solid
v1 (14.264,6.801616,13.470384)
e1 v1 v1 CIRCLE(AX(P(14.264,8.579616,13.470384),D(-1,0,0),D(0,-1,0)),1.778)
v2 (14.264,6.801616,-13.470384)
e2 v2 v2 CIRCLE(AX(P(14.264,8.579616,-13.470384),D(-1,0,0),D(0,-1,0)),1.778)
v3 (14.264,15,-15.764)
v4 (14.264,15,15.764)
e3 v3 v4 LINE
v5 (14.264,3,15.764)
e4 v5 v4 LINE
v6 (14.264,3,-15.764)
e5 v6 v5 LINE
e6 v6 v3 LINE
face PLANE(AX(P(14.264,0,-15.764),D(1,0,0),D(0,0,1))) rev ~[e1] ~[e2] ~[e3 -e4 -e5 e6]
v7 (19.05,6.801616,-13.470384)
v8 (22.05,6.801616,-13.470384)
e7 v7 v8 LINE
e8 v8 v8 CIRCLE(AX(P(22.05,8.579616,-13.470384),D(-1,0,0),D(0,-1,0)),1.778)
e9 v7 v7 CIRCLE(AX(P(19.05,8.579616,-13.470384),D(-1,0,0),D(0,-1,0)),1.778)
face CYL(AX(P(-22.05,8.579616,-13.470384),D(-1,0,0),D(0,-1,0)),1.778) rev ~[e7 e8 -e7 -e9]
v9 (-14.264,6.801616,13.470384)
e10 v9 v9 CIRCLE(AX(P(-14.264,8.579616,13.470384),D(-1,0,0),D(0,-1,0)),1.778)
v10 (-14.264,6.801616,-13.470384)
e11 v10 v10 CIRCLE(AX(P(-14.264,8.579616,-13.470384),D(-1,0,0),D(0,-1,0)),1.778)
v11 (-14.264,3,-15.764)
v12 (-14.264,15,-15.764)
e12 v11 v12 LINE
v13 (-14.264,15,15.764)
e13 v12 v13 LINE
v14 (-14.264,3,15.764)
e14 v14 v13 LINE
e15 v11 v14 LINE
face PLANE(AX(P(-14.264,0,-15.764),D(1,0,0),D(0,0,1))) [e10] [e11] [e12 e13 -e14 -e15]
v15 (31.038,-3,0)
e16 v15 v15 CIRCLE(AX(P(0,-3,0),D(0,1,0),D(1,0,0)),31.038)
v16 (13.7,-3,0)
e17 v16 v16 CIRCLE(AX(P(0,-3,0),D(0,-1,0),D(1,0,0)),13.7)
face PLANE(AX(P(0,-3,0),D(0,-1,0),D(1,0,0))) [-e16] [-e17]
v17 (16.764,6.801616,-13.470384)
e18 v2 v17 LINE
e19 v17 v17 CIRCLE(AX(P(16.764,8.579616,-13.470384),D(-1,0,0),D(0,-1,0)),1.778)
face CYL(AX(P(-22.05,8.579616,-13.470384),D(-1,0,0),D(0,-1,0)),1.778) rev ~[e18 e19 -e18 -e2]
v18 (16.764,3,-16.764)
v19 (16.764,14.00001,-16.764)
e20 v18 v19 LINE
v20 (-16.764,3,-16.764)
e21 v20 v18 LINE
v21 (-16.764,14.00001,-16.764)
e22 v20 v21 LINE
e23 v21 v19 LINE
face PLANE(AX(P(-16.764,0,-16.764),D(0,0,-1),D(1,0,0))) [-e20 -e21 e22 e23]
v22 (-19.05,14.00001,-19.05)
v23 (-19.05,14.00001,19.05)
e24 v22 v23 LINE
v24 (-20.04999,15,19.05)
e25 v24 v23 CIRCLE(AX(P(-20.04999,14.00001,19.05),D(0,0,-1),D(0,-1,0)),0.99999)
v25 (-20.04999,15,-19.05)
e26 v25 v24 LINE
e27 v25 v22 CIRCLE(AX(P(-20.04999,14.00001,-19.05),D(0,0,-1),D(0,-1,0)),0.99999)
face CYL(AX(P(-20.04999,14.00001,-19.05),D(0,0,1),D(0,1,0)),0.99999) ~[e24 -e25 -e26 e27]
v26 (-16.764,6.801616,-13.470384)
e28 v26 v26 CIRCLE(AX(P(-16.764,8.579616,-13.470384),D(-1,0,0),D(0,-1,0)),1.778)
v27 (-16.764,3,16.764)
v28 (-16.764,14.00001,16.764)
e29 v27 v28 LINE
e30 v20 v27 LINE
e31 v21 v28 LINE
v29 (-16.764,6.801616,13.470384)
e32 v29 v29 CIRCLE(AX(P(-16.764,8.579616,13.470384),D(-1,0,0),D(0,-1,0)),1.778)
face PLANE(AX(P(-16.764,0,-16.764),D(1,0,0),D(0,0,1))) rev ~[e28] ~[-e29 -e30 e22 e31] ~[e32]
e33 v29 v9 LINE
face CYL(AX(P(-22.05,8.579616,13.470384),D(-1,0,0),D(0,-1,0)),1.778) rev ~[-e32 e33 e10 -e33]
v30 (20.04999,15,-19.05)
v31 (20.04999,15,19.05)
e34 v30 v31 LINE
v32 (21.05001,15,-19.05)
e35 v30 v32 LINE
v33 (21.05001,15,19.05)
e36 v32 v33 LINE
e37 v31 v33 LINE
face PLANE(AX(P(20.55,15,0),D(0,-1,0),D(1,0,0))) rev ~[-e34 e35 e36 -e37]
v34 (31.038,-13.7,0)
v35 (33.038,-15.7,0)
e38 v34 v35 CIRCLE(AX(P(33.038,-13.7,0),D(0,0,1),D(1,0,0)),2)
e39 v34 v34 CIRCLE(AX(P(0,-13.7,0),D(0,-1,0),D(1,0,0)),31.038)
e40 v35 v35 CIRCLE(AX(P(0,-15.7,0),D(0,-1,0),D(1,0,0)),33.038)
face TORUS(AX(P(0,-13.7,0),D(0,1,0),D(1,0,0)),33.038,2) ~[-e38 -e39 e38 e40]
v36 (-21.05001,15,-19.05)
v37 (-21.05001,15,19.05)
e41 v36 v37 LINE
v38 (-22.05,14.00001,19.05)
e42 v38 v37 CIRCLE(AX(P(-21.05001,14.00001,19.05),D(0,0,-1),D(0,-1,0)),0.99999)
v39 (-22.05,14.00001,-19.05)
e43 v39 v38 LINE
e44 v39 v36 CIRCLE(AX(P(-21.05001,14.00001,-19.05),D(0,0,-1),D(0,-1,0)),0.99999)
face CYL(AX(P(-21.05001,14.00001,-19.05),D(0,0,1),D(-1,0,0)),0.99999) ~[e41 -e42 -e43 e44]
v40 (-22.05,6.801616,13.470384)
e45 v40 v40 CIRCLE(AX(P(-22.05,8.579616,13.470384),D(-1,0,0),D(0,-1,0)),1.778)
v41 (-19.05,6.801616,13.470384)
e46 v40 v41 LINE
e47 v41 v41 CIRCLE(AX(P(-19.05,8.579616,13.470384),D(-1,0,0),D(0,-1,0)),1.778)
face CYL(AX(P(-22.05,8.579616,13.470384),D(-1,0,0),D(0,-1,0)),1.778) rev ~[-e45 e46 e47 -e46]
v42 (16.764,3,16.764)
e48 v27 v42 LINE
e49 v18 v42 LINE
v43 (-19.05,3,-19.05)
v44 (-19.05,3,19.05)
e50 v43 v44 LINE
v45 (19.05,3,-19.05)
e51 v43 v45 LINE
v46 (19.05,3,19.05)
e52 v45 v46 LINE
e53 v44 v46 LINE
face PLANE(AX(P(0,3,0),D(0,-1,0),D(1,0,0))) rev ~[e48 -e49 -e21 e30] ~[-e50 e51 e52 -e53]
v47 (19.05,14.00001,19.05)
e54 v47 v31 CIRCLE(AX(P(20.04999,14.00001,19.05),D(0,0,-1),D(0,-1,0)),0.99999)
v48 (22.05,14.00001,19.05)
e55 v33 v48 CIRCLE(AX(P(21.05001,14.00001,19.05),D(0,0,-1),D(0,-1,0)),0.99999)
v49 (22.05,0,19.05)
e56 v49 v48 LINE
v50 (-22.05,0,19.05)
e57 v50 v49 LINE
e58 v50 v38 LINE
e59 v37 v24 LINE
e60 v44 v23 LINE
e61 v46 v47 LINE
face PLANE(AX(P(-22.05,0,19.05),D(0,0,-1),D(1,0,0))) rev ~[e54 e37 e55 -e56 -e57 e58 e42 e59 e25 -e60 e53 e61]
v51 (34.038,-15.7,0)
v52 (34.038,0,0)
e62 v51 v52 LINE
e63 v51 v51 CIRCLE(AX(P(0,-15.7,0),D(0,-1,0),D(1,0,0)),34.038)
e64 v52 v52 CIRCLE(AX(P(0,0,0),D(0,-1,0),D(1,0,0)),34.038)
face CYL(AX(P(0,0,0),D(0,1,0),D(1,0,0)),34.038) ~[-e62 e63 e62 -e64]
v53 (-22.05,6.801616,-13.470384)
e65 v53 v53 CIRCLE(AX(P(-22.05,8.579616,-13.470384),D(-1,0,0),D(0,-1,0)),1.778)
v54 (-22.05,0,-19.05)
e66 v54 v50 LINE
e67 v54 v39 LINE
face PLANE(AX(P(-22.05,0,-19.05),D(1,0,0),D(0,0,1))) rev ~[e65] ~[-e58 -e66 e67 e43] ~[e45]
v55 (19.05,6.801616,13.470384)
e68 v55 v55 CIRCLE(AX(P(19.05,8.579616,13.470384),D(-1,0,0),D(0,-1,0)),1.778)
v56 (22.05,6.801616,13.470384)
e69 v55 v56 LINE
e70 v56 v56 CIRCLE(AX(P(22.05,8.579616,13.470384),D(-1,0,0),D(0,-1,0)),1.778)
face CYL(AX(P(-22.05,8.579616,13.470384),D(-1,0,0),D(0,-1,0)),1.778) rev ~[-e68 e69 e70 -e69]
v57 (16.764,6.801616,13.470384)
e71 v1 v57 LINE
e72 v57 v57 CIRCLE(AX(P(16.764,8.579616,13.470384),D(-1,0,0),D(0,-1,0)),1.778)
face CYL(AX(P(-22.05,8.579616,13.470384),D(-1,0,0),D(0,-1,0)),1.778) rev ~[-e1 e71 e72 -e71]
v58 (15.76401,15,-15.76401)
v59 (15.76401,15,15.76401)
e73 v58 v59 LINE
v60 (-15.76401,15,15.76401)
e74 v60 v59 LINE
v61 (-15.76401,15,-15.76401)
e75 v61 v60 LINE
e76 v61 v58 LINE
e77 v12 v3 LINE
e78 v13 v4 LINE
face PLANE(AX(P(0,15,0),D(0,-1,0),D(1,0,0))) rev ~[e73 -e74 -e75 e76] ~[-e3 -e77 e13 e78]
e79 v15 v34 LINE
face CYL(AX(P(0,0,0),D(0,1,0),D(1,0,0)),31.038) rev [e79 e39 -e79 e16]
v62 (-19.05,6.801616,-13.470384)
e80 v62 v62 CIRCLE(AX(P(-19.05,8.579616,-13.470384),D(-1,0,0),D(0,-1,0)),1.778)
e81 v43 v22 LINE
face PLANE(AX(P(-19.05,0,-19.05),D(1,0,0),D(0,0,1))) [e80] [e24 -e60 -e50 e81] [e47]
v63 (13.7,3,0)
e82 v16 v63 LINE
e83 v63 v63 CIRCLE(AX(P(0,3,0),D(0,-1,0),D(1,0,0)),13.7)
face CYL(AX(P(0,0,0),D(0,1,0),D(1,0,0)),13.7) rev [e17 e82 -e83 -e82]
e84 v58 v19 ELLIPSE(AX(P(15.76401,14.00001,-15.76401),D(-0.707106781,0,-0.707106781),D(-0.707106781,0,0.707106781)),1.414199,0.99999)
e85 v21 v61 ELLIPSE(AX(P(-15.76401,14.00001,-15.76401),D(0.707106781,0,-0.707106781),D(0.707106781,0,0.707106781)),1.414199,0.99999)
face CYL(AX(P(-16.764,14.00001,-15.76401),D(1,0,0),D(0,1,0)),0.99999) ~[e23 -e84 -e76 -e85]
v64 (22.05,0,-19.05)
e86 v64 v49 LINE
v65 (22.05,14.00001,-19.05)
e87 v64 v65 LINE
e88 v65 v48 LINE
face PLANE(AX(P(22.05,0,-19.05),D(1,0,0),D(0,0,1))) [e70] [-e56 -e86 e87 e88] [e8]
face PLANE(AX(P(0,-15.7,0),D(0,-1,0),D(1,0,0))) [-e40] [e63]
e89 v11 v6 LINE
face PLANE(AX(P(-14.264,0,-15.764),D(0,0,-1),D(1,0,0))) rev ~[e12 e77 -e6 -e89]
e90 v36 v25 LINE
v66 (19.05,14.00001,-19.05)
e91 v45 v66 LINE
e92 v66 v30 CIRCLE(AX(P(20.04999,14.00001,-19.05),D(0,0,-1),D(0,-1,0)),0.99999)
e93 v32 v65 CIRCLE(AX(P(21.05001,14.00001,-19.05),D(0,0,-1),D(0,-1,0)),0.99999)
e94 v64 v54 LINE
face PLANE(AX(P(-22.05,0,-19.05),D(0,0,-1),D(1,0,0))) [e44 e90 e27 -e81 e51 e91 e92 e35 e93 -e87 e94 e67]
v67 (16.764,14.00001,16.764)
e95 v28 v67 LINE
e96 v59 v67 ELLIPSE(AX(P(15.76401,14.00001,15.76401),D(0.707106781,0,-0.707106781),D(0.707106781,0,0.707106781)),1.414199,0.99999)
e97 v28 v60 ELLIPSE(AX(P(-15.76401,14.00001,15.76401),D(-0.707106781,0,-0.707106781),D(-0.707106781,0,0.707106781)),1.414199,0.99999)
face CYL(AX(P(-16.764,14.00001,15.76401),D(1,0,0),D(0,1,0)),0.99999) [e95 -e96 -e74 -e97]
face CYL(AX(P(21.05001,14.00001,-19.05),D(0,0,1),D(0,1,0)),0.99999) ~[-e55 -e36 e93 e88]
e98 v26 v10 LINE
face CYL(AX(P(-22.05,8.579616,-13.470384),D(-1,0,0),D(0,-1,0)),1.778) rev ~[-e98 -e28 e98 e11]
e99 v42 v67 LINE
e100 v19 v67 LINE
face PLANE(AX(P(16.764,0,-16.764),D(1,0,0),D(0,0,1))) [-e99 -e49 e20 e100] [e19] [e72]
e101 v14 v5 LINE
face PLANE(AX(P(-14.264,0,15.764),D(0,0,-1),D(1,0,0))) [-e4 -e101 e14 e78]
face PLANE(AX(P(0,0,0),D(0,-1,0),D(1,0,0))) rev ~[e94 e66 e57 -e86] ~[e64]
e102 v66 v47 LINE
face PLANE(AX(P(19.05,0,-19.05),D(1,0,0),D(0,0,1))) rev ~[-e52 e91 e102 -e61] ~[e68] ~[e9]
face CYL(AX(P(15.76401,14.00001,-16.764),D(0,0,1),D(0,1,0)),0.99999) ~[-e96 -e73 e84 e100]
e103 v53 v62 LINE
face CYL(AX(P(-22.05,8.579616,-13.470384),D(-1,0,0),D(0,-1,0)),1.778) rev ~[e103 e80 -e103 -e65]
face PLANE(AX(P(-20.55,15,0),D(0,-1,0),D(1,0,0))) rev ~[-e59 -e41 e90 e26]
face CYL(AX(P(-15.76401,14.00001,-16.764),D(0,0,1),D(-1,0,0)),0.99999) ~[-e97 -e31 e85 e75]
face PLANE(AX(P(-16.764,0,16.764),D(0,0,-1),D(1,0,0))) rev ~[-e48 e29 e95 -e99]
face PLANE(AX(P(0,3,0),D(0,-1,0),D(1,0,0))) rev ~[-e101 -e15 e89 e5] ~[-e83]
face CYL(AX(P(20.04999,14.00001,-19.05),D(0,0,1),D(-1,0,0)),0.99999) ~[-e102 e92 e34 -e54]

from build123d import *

# Parameters (mm, degrees)
F0_R     = 34.038
F0_R_2   = 31.038
F0_W     = 38.1
F0_H     = 38.1
F0_R_3   = 13.7
F1_DEPTH = 3
F2_DEPTH = 3
F3_DEPTH = 15.7
F4_R     = 2
F5_W     = 3
F5_H     = 38.1
F5_W_2   = 33.528
F5_H_2   = 33.528
F5_W_3   = 28.528
F5_H_3   = 31.528
F6_DEPTH = 15
F7_R     = 0.99999
F8_R     = 1.778
F9_DEPTH = 56.089


# Not quite as in the source:
# - a fillet or chamfer is up to 0.001 mm smaller than in the source, because OpenCascade refuses the exact size
# - a feature names something its author has since deleted; it is built from what else it names


with BuildPart() as f1:
    # F0 (on Front) → F1 (new body)
    with BuildSketch(Plane.XZ):
        Circle(F0_R)
        Circle(F0_R_2, mode=Mode.SUBTRACT)
        Circle(F0_R_2)
        Rectangle(F0_W, F0_H, mode=Mode.SUBTRACT)
        Rectangle(F0_W, F0_H)
        Circle(F0_R_3, mode=Mode.SUBTRACT)
    extrude(amount=F1_DEPTH)

    # F0 (on Front) → F2 (join)
    with BuildSketch(Plane.XZ):
        Rectangle(F0_W, F0_H)
        Circle(F0_R_3, mode=Mode.SUBTRACT)
    extrude(amount=-F2_DEPTH)

    # F0 (on Front) → F3 (join)
    with BuildSketch(Plane.XZ):
        Circle(F0_R)
        Circle(F0_R_2, mode=Mode.SUBTRACT)
    extrude(amount=F3_DEPTH)

    # F4
    f4_edges = [f1.edges().sort_by_distance(p)[0] for p in [
        (-31.038, -15.7, 0),
    ]]
    fillet(f4_edges, radius=F4_R)

    # F5 (on Front) → F6 (join)
    with BuildSketch(Plane.XZ):
        with Locations((-20.55, 0)):
            Rectangle(F5_W, F5_H)
        with Locations((20.55, 0)):
            Rectangle(F5_W, F5_H)
        Rectangle(F5_W_2, F5_H_2)
        Rectangle(F5_W_3, F5_H_3, mode=Mode.SUBTRACT)
    extrude(amount=-F6_DEPTH)

    # F7 (radius 1 in the source; OpenCascade refuses exactly that, so slightly less here)
    f7_edges = [f1.edges().sort_by_distance(p)[0] for p in [
        (-19.05, 15, 0),
        (-16.764, 15, 0),
        (19.05, 15, 0),
        (16.764, 15, 0),
        (0, 15, 16.764),
        (0, 15, -16.764),
        (22.05, 15, 0),
        (-22.05, 15, 0),
    ]]
    fillet(f7_edges, radius=F7_R)

    # F8 (on face) → F9 (cut, through all)
    with BuildSketch(Plane(origin=(-22.05, 0, 0), x_dir=(0, -1, 0), z_dir=(-1, 0, 0))):
        with Locations((-8.5796158184, 13.4703841816)):
            Circle(F8_R)
        with Locations((-8.5796158184, -13.4703841816)):
            Circle(F8_R)
    extrude(amount=-F9_DEPTH, mode=Mode.SUBTRACT)


solid = f1.part
